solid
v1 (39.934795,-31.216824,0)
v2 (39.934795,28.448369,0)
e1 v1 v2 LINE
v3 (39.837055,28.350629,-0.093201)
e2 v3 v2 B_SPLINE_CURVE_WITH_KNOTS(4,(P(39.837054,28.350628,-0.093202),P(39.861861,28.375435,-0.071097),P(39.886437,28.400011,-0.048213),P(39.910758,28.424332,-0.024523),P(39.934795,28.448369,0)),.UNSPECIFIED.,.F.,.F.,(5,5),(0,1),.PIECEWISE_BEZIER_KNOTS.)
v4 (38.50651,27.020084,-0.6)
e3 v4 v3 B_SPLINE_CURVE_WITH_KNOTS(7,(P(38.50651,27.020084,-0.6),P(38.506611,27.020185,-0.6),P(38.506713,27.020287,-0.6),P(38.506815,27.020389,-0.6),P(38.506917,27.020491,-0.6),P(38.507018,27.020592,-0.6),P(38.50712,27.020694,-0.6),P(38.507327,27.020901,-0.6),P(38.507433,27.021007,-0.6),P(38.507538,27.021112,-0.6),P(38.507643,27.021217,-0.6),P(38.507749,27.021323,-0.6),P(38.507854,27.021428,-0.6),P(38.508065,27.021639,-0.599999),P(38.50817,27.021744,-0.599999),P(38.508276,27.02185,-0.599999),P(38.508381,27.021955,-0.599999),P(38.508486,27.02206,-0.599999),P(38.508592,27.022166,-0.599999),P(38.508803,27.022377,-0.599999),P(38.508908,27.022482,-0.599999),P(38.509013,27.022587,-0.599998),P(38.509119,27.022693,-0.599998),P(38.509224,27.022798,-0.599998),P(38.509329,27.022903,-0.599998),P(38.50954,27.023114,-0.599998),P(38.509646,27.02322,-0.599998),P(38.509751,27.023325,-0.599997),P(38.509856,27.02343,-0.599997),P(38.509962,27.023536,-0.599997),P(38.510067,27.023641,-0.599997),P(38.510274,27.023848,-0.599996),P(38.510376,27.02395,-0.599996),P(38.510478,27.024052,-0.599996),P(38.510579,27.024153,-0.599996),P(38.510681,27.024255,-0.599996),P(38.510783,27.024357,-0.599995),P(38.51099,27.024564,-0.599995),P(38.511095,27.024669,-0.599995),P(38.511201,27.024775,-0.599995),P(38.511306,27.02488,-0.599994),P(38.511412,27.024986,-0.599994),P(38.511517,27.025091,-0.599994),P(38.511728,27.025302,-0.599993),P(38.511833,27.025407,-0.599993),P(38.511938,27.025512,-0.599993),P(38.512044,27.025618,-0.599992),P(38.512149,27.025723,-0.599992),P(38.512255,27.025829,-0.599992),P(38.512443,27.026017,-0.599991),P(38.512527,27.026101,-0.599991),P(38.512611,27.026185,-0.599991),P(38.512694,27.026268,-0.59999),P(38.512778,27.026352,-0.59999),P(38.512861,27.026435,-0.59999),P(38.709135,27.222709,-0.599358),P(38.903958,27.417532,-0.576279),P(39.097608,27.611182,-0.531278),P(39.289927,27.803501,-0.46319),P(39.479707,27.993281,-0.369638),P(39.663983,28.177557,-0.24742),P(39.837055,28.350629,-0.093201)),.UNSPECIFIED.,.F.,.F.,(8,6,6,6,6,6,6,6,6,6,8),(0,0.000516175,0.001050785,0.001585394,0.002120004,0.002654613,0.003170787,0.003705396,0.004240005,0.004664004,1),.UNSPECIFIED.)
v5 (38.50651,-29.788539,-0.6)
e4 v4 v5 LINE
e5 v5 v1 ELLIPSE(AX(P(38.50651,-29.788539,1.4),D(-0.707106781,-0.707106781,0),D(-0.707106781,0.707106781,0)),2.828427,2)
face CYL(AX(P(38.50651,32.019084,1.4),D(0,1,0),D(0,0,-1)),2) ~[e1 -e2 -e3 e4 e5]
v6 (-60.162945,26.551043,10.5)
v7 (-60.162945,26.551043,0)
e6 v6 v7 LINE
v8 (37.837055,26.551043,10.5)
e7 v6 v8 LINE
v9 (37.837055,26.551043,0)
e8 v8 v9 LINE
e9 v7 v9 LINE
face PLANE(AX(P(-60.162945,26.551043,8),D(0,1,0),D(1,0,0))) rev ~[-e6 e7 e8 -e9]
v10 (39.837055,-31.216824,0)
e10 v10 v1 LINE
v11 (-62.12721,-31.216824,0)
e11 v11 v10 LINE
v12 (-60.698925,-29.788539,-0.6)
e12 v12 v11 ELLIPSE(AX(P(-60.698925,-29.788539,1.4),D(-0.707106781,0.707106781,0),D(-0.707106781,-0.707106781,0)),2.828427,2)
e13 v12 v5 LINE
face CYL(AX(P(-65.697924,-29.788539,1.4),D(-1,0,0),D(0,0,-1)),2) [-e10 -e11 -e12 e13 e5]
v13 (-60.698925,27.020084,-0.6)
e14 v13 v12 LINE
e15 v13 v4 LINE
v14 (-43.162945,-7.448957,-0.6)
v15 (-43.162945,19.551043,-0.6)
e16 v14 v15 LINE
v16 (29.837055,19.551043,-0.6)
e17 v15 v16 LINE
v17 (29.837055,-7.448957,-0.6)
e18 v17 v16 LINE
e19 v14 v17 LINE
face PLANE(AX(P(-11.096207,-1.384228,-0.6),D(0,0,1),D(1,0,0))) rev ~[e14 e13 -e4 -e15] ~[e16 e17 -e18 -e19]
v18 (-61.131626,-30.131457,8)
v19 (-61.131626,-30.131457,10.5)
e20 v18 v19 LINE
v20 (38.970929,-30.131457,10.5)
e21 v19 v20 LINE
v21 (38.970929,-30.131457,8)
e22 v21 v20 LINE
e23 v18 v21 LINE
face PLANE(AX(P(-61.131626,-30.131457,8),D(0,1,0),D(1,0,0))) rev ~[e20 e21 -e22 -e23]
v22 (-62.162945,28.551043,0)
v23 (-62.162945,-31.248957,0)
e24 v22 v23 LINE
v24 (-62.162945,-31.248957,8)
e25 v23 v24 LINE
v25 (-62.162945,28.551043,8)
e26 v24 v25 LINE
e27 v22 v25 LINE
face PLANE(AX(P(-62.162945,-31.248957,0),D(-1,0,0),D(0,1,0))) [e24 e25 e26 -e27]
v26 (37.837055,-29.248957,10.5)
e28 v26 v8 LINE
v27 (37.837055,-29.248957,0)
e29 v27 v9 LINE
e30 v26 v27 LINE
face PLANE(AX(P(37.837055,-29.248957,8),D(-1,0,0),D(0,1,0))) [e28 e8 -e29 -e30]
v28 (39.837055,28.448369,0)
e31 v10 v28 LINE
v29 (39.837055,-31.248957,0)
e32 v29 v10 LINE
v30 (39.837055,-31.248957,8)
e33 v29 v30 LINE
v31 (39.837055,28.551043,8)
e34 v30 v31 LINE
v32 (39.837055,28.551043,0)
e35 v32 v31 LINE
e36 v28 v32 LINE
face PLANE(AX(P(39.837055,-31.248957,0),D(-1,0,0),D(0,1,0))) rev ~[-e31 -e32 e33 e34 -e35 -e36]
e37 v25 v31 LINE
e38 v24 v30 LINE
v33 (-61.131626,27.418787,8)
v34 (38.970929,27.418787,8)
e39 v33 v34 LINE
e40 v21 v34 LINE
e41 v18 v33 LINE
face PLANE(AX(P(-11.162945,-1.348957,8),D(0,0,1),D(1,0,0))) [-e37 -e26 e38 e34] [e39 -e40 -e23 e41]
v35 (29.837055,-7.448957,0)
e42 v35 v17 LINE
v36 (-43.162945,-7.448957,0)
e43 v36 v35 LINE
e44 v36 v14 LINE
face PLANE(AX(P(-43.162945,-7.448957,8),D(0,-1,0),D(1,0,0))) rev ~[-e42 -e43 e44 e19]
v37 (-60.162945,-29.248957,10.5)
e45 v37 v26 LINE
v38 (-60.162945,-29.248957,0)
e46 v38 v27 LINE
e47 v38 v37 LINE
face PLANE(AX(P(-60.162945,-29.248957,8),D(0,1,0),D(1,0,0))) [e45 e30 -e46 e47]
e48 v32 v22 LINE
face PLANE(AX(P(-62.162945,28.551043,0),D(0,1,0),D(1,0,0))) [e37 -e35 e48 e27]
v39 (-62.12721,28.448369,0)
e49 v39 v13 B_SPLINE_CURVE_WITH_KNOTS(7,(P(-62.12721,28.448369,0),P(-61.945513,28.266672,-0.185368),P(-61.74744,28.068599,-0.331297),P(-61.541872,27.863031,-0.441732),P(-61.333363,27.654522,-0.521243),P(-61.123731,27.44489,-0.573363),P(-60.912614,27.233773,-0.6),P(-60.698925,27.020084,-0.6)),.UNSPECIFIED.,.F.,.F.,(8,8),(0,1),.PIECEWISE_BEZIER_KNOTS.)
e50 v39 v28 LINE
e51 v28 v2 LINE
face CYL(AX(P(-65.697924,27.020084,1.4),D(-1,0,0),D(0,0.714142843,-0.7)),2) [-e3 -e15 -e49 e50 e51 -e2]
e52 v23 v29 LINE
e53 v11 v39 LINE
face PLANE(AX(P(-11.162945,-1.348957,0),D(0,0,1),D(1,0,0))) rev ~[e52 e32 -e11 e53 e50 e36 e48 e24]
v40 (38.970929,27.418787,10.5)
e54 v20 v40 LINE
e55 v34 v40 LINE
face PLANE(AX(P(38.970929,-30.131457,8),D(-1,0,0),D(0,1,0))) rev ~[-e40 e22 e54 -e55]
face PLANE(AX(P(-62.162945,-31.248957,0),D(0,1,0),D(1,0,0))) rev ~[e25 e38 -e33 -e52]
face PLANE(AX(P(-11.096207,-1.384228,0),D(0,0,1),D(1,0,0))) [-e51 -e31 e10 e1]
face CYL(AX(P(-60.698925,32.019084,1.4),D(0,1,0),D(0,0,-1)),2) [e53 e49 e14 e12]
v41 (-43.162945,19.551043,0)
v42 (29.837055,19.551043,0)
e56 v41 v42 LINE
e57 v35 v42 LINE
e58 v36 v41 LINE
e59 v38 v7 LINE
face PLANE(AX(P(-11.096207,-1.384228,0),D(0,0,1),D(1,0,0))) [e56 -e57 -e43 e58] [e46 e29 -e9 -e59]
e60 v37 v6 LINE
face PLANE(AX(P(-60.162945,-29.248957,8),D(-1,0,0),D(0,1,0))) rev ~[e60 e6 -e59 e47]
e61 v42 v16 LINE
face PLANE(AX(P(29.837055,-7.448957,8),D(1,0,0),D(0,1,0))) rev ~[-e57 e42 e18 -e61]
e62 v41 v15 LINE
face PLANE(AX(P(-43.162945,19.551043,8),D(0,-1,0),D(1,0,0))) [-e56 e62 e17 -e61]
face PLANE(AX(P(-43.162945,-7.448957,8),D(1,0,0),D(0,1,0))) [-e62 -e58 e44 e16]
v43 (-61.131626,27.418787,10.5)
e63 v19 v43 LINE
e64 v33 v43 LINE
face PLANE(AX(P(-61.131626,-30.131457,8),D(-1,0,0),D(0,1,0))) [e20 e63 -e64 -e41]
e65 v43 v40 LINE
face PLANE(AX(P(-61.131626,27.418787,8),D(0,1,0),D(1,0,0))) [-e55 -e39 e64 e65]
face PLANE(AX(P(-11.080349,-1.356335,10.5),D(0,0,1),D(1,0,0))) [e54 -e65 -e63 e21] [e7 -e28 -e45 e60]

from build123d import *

# Parameters (mm, degrees)
F0_W        = 102
F0_H        = 59.8
F0_W_2      = 98
F0_H_2      = 55.8
F1_DEPTH    = 8
F2_W        = 102.0620055497
F2_H        = 59.6651937813
F3_DEPTH    = 0.6
F4_W        = 100.1025550067
F4_H        = 57.5502440333
F4_W_2      = 98
F4_H_2      = 55.8
F5_DEPTH    = 2.5
F6_T1_DEPTH = 105.5349790349
F6_T3_DEPTH = 3.6684549434
F6_T5_DEPTH = 66.8066222098
F6_T7_DEPTH = 3.6684549117
F6_T9_DEPTH = 105.5349790665
F7_W        = 73
F7_H        = 27
F8_DEPTH    = 8.6010001


# Not quite as in the source:
# - a fillet or chamfer that OpenCascade refuses, or shapes differently, is made with other operations: its cross-section is extruded or revolved along the edge and cut away or added


with BuildPart() as f1:
    # F0 (on Top) → F1 (new body)
    with BuildSketch(Plane.XY):
        with Locations((-11.1629452705, -1.3489569187)):
            Rectangle(F0_W, F0_H)
        with Locations((-11.1629452705, -1.3489569187)):
            Rectangle(F0_W_2, F0_H_2, mode=Mode.SUBTRACT)
    extrude(amount=F1_DEPTH)

    # F2 (on Top) → F3 (join)
    with BuildSketch(Plane.XY):
        with Locations((-11.096207425, -1.3842275366)):
            Rectangle(F2_W, F2_H)
    extrude(amount=-F3_DEPTH)

    # F4 (on face) → F5 (join)
    with BuildSketch(Plane.XY.offset(8)):
        with Locations((-11.0803488642, -1.3563353568)):
            Rectangle(F4_W, F4_H)
        with Locations((-11.1629452705, -1.3489569187)):
            Rectangle(F4_W_2, F4_H_2, mode=Mode.SUBTRACT)
    extrude(amount=F5_DEPTH)

    # F6: fillet of radius 2 on 4 edges, made by hand

    # F6_s2 → F6_t1 (cut)
    with BuildSketch(Plane.YZ.offset(-65.6979244141)):
        with BuildLine():
            ThreePointArc((-29.7885387415, -0.6), (-30.5631354108, -0.4439088915), (-31.2168244272, 0))
            Line((-31.2168244272, 0), (-31.2168244272, -0.6))
            Line((-31.2168244272, -0.6), (-29.7885387415, -0.6))
        make_face()
    extrude(amount=F6_T1_DEPTH, mode=Mode.SUBTRACT)

    # F6_s4 → F6_t3 (cut)
    with BuildSketch(Plane.YZ.offset(39.8370546207)):
        with BuildLine():
            ThreePointArc((-29.7885387415, -0.6), (-30.5631354108, -0.4439088915), (-31.2168244272, 0))
            Line((-31.2168244272, 0), (-31.2168244272, -0.6))
            Line((-31.2168244272, -0.6), (-29.7885387415, -0.6))
        make_face()
    extrude(amount=F6_T3_DEPTH, mode=Mode.SUBTRACT)

    # F6_s6 → F6_t5 (cut)
    with BuildSketch(Plane.XZ.offset(-32.0190835683)):
        with BuildLine():
            ThreePointArc((-60.6989245141, -0.6), (-61.4735211834, -0.4439088915), (-62.1272101998, 0))
            Line((-62.1272101998, 0), (-62.1272101998, -0.6))
            Line((-62.1272101998, -0.6), (-60.6989245141, -0.6))
        make_face()
        with BuildLine():
            ThreePointArc((38.5065096641, -0.6), (39.2811063334, -0.4439088915), (39.9347953498, 0))
            Line((39.9347953498, 0), (39.9347953498, -0.6))
            Line((39.9347953498, -0.6), (38.5065096641, -0.6))
        make_face()
    extrude(amount=F6_T5_DEPTH, mode=Mode.SUBTRACT)

    # F6_s8 → F6_t7 (cut)
    with BuildSketch(Plane.YZ.offset(39.8370546524)):
        with BuildLine():
            ThreePointArc((28.448369354, 0), (27.7946803375, -0.4439088915), (27.0200836683, -0.6))
            Line((27.0200836683, -0.6), (28.448369354, -0.6))
            Line((28.448369354, -0.6), (28.448369354, 0))
        make_face()
    extrude(amount=F6_T7_DEPTH, mode=Mode.SUBTRACT)

    # F6_s10 → F6_t9 (cut)
    with BuildSketch(Plane.YZ.offset(-65.6979244141)):
        with BuildLine():
            ThreePointArc((28.448369354, 0), (27.7946803375, -0.4439088915), (27.0200836683, -0.6))
            Line((27.0200836683, -0.6), (28.448369354, -0.6))
            Line((28.448369354, -0.6), (28.448369354, 0))
        make_face()
    extrude(amount=F6_T9_DEPTH, mode=Mode.SUBTRACT)

    # F7 (on face) → F8 (cut, through all)
    with BuildSketch(Plane.XY.offset(8)):
        with Locations((-6.6629452705, 6.0510430813)):
            Rectangle(F7_W, F7_H)
    extrude(amount=-F8_DEPTH, mode=Mode.SUBTRACT)


solid = f1.part
